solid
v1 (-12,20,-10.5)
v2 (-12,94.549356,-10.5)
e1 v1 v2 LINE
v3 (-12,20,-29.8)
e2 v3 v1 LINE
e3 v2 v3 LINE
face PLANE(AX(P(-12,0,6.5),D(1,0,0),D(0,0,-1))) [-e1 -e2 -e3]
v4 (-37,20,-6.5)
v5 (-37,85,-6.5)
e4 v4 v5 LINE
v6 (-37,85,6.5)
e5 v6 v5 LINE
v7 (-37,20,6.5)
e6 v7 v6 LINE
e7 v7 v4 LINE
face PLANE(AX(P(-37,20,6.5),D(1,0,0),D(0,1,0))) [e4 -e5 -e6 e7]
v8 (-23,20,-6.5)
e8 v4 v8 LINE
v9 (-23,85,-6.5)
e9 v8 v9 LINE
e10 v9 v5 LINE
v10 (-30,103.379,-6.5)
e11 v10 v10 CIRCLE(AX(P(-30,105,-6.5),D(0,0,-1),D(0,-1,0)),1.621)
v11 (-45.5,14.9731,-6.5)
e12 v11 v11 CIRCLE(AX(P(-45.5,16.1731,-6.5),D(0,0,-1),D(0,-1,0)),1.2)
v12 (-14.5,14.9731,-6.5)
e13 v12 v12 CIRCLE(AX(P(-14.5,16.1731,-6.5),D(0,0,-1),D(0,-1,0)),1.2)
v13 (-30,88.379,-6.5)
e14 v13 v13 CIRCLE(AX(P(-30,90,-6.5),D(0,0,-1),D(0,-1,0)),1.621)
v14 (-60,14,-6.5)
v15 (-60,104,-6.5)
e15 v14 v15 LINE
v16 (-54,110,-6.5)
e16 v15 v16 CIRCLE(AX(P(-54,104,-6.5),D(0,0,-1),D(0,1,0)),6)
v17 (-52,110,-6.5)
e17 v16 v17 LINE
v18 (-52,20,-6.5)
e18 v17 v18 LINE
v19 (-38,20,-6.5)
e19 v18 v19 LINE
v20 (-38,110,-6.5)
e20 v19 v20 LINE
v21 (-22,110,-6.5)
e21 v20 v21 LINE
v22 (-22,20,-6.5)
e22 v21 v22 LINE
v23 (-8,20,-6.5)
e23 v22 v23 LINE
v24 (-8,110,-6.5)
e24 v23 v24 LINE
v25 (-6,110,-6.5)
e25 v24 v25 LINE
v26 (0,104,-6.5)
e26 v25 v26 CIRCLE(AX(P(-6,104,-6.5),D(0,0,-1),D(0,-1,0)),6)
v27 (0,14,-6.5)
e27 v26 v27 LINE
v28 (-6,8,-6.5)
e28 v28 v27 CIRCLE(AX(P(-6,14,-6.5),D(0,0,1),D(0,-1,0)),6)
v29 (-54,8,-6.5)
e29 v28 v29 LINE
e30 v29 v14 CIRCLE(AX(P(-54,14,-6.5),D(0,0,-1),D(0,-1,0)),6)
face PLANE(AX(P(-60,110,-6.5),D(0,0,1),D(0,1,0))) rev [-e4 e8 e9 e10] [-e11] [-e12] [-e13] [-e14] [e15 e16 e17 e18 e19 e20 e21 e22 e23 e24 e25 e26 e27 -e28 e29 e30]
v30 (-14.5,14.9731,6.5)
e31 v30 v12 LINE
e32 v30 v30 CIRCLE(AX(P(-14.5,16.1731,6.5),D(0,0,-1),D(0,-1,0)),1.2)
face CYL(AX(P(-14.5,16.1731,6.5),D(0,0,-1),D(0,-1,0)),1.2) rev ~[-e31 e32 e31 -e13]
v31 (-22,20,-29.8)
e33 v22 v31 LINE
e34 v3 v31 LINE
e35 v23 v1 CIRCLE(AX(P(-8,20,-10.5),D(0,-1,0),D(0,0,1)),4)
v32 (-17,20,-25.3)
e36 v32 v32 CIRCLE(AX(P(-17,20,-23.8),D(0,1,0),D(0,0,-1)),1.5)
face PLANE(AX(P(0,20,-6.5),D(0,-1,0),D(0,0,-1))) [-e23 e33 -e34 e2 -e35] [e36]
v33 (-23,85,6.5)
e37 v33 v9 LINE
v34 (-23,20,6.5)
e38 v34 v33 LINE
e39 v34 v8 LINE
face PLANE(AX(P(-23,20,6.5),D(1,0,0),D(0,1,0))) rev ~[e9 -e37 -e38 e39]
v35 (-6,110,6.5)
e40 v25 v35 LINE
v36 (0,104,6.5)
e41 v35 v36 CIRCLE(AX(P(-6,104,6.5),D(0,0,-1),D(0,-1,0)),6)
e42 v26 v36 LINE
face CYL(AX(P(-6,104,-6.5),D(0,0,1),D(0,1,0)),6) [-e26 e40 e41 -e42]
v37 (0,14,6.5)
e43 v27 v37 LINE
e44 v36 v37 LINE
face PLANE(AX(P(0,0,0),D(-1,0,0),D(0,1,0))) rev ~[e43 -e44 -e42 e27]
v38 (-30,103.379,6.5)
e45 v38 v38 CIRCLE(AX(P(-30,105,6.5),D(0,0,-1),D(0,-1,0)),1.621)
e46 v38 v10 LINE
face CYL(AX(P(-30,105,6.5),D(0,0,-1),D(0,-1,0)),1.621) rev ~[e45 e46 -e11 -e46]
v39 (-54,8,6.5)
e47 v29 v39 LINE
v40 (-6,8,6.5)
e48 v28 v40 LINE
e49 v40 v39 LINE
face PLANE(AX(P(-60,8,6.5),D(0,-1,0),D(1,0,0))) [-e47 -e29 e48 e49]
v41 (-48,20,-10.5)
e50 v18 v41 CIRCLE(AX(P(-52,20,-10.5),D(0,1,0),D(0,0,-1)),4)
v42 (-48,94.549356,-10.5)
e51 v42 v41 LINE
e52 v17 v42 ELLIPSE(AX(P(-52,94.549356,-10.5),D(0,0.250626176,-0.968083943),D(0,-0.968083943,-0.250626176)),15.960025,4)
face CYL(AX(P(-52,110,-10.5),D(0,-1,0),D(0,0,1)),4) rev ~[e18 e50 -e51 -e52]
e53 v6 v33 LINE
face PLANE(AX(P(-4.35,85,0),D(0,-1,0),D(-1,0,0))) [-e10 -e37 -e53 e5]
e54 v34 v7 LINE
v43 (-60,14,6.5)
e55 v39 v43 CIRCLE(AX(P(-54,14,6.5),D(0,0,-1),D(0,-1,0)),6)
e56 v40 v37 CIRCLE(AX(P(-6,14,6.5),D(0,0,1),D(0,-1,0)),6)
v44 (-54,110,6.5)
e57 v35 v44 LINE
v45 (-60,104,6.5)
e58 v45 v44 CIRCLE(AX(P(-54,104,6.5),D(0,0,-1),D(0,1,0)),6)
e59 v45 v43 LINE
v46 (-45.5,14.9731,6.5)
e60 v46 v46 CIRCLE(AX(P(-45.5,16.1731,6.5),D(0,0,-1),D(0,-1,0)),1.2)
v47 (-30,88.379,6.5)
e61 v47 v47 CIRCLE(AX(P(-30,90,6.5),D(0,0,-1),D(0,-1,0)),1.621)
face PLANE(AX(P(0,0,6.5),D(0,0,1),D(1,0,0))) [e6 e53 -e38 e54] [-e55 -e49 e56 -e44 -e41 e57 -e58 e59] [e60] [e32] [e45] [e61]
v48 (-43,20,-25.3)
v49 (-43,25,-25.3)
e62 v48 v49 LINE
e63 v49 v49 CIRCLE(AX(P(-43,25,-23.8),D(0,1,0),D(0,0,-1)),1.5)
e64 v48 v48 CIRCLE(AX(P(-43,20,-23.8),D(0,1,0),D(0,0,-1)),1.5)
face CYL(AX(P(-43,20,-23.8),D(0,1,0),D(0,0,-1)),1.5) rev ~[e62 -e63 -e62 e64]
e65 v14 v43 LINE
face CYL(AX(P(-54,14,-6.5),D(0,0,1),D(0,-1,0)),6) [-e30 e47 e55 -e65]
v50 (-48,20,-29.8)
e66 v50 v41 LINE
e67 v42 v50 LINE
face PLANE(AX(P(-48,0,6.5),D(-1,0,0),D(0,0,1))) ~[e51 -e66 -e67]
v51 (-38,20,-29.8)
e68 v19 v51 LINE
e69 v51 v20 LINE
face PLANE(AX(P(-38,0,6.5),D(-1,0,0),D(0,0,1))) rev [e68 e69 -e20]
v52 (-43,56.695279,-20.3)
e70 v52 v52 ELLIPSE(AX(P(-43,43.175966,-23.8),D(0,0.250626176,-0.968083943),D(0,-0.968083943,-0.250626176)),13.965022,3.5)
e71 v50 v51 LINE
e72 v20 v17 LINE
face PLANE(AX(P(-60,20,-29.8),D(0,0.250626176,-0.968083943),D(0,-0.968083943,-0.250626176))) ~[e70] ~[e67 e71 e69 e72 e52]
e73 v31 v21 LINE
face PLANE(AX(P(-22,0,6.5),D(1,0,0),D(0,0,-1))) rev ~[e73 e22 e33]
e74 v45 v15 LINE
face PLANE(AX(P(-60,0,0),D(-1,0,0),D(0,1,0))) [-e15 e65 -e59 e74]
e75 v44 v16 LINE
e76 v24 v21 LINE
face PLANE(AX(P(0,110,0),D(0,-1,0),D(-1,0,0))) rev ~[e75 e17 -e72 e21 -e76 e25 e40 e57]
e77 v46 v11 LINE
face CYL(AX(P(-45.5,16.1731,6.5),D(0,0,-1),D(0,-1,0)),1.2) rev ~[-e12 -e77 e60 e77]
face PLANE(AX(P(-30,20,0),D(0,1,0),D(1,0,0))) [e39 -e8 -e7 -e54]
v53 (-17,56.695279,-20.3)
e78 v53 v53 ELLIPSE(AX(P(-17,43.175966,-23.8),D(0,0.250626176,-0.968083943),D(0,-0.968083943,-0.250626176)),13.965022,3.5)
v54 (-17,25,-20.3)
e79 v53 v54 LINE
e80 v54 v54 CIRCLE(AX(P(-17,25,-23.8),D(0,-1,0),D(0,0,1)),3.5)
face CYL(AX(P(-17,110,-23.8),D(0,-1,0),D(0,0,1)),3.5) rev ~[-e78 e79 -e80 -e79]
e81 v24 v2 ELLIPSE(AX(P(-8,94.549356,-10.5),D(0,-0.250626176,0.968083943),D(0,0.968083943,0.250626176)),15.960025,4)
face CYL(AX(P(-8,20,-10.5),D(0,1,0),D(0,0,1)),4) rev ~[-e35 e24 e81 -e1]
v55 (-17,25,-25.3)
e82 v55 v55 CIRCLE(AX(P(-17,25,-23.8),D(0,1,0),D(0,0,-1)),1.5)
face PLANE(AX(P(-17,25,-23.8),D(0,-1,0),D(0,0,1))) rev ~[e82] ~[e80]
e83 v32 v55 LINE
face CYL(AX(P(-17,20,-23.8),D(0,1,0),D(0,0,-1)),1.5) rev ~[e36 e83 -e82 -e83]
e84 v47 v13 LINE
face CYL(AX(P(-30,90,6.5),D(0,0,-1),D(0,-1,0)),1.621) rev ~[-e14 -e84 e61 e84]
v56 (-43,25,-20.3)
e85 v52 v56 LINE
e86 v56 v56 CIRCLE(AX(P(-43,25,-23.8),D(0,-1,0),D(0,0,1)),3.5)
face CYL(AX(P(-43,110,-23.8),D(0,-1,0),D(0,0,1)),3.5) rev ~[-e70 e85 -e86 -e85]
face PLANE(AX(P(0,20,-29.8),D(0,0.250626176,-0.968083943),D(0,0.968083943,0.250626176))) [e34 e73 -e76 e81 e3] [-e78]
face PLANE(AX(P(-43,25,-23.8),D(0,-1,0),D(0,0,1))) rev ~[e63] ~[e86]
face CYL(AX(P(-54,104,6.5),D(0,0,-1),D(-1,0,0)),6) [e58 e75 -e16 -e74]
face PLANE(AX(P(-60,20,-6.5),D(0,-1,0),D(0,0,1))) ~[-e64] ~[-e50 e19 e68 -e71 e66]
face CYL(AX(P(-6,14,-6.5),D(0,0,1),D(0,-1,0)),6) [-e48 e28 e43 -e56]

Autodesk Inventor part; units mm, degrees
ref_plane "YZ Plane" through (0, 0, 0) normal (1, 0, 0) x (0, 1, 0)
sketch "Sketch1" plane through (0, 0, 0) normal (0, 0, 1) x (1, 0, 0)
  line L0 (0, 0) -> (-60, 0)
  line L1 (-60, 0) -> (-60, 20)
  line L2 (-60, 20) -> (-60, 110)
  line L3 (-60, 110) -> (-30, 110)
  line L4 (-30, 0) -> (-30, 110)
  line L5 (-30, 20) -> (-55.65, 20)
  line L6 (-55.65, 20) -> (-55.65, 85)
  line L7 (-55.65, 85) -> (-30, 85)
  line L8 (0, 20) -> (0, 110)
  line L9 (0, 110) -> (-30, 110)
  line L10 (-30, 20) -> (-4.35, 20)
  line L11 (-4.35, 20) -> (-4.35, 85)
  line L12 (-4.35, 85) -> (-30, 85)
  line L13 (0, 0) -> (0, 20)
  line L14 (-30, 20) -> (-45, 20)
  dimension "d0" = 60
  dimension "d1" = 20
  dimension "d2" = 90
  dimension "d3" = 65
  dimension "d39" = 15
extrude "Extrusion1" add sketch "Sketch1" along normal mid plane 13 contours L0 L4 L10 L11 L12 L9 L8 L13 | L0 L1 L2 L3 L4 L7 L6 L5
sketch "Sketch2" plane through (0, 0, 6.5) normal (1, 0, 0) x (0, 0, -1)
  line L0 (13, 0) -> (13, 110) projected
  line L1 (13, 0) -> (13, 20)
  line L2 (13, 20) -> (36.3, 20)
  line L3 (36.3, 20) -> (13, 110)
  point P0 (6.5, 0)
  dimension "d6" = 20
  dimension "d7" = 23.3
extrude "Extrusion2" add sketch "Sketch2" against normal blind 22
ref_plane "Work Plane1" through (-30, 20, 6.5) normal (-1, 0, 0) x (0, 0, 1)
mirror "Mirror1" about plane through (-30, 20, 6.5) normal (-1, 0, 0) of "Extrusion2"
sketch "Sketch3" plane through (0, 0, 6.5) normal (0, 0, 1) x (1, 0, 0)
  line L0 (-4.35, 20) -> (-55.65, 20) projected
  line L1 (-30, 20) -> (-30, 0)
  line L2 (-60, 0) -> (0, 0) projected
  line L3 (-30, 16.1731) -> (-45.5, 16.1731)
  line L4 (-30, 16.1731) -> (-14.5, 16.1731)
  dimension "d17" = 15.5
sketch "Sketch4" plane through (0, 0, 6.5) normal (0, 0, 1) x (1, 0, 0)
  line L0 (-55.65, 85) -> (-4.35, 85) projected
  line L1 (-30, 85) -> (-30, 110)
  line L2 (0, 110) -> (-60, 110) projected
  line L3 (-30, 85) -> (-30, 90)
  line L4 (-30, 90) -> (-30, 105)
  point P0 (0, 0)
  dimension "d25" = 5
  dimension "d26" = 15
hole "Hole2" at (-30, 90, 6.5) at (-30, 105, 6.5) direction (0, 0, -1) diameter 3.242 end through all thread size "M4x0.7" class "6H" standard "ISO Metric profile"
sketch "Sketch5" plane through (-60, 20, -29.8) normal (0, -1, 0) x (1, 0, 0)
  line L0 (0, 0) -> (22, 0) projected
  line L1 (0, 0) -> (0, 6)
  line L2 (0, 0) -> (0, 23.3) projected
  line L3 (0, 6) -> (60, 6)
  line L4 (60, 0) -> (60, 23.3) projected
  line L5 (60, 6) -> (43, 6)
  line L6 (0, 6) -> (17, 6)
  point P0 (60, 29.8)
  point P1 (17, 6)
  dimension "d34" = 6
  dimension "d35" = 17
  dimension "d36" = 17
hole "Hole3" at (-43, 20, -23.8) at (-17, 20, -23.8) direction (0, 1, 0) diameter 3 end through all
sketch "Sketch6" plane through (0, 0, 6.5) normal (1, 0, 0) x (0, 0, -1)
  line L0 (13, 110) -> (0, 110) projected
  line L1 (13, 0) -> (13, 20) projected
  line L2 (13, 110) -> (13, 20)
  line L3 (36.3, 20) -> (13, 20) projected
  line L4 (13, 20) -> (36.3, 20)
  line L5 (13, 110) -> (36.3, 20) projected
  line L6 (36.3, 20) -> (13, 110)
  point P0 (6.5, 0)
extrude "Extrusion3" cut sketch "Sketch6" against normal blind 12
mirror "Mirror2" about plane through (-30, 20, 6.5) normal (-1, 0, 0) of "Extrusion3"
sketch "Sketch8" plane through (0, 0, 6.5) normal (0, 0, 1) x (1, 0, 0)
  line L0 (-4.35, 20) -> (-55.65, 20) projected
  line L1 (-30, 20) -> (-30, 85)
  line L2 (-55.65, 85) -> (-4.35, 85) projected
  line L3 (-30, 20) -> (-37, 20)
  line L4 (-37, 20) -> (-37, 85)
  line L5 (-55.65, 20) -> (-55.65, 85) projected
  line L6 (-37, 85) -> (-55.65, 85)
  line L7 (-55.65, 85) -> (-55.65, 20)
  line L8 (-55.65, 20) -> (-37, 20)
  line L9 (-23, 20) -> (-23, 85)
  line L10 (-4.35, 20) -> (-4.35, 85)
  line L11 (-23, 85) -> (-4.35, 85)
  line L12 (-4.35, 85) -> (-4.35, 20)
  line L13 (-4.35, 20) -> (-23, 20)
  point P0 (0, 0)
  point P1 (-23, 85)
  dimension "d43" = 7
extrude "Extrusion5" add sketch "Sketch8" against normal blind 13 contours L0 L9 L2 L10 | L0 L5 L2 L4
sketch "Sketch9" plane through (-60, 0, 6.5) normal (0, -1, 0) x (1, 0, 0)
  line L0 (60, -13) -> (60, 0) projected
  line L1 (60, 0) -> (0, 0) projected
  line L2 (60, -13) -> (0, -13)
  line L3 (0, -13) -> (0, 0)
  line L4 (0, 0) -> (60, 0)
  line L5 (60, 0) -> (60, -13)
  point P0 (60, -6.5)
extrude "Extrusion6" cut sketch "Sketch9" against normal blind 8
fillet "Fillet1" radius 6 4 edges at (0, 8, 0) (-60, 8, 0) (-60, 110, 0) (0, 110, 0)
fillet "Fillet2" radius 4 2 edges at (-48, 65, -6.5) (-12, 65, -6.5)
ref_plane "Work Plane2" through (-54, 110, 6.5) normal (0, 1, 0) x (1, 0, 0)
sketch "Sketch10" plane through (-54, 110, 6.5) normal (0, 1, 0) x (1, 0, 0)
  circle A0 centre (11, 30.3) radius 1.5 projected
  line L0 (11, 30.3) -> (11, 36.3)
  line L1 (6, 36.3) -> (16, 36.3) projected
  circle A1 centre (37, 30.3) radius 1.5 projected
  line L2 (37, 30.3) -> (37, 36.3)
  line L3 (42, 36.3) -> (32, 36.3) projected
  point P0 (54, 6.5)
hole "Hole4" at (-43, 110, -23.8) at (-17, 110, -23.8) direction (0, -1, 0) diameter 7 depth 85
hole "Hole5" at (-14.5, 16.1731, 6.5) at (-45.5, 16.1731, 6.5) direction (0, 0, -1) diameter 2.4 end through all clearance for "Countersunk Flat Head Screw ISO 2009/7046" size "M2" standard "ISO"
thread "Thread1" size "M5x0.8" class "6H" standard "ISO Metric profile" full length
thread "Thread2" size "M5x0.8" class "6H" standard "ISO Metric profile" full length
properties part number "stand_less_rough"
